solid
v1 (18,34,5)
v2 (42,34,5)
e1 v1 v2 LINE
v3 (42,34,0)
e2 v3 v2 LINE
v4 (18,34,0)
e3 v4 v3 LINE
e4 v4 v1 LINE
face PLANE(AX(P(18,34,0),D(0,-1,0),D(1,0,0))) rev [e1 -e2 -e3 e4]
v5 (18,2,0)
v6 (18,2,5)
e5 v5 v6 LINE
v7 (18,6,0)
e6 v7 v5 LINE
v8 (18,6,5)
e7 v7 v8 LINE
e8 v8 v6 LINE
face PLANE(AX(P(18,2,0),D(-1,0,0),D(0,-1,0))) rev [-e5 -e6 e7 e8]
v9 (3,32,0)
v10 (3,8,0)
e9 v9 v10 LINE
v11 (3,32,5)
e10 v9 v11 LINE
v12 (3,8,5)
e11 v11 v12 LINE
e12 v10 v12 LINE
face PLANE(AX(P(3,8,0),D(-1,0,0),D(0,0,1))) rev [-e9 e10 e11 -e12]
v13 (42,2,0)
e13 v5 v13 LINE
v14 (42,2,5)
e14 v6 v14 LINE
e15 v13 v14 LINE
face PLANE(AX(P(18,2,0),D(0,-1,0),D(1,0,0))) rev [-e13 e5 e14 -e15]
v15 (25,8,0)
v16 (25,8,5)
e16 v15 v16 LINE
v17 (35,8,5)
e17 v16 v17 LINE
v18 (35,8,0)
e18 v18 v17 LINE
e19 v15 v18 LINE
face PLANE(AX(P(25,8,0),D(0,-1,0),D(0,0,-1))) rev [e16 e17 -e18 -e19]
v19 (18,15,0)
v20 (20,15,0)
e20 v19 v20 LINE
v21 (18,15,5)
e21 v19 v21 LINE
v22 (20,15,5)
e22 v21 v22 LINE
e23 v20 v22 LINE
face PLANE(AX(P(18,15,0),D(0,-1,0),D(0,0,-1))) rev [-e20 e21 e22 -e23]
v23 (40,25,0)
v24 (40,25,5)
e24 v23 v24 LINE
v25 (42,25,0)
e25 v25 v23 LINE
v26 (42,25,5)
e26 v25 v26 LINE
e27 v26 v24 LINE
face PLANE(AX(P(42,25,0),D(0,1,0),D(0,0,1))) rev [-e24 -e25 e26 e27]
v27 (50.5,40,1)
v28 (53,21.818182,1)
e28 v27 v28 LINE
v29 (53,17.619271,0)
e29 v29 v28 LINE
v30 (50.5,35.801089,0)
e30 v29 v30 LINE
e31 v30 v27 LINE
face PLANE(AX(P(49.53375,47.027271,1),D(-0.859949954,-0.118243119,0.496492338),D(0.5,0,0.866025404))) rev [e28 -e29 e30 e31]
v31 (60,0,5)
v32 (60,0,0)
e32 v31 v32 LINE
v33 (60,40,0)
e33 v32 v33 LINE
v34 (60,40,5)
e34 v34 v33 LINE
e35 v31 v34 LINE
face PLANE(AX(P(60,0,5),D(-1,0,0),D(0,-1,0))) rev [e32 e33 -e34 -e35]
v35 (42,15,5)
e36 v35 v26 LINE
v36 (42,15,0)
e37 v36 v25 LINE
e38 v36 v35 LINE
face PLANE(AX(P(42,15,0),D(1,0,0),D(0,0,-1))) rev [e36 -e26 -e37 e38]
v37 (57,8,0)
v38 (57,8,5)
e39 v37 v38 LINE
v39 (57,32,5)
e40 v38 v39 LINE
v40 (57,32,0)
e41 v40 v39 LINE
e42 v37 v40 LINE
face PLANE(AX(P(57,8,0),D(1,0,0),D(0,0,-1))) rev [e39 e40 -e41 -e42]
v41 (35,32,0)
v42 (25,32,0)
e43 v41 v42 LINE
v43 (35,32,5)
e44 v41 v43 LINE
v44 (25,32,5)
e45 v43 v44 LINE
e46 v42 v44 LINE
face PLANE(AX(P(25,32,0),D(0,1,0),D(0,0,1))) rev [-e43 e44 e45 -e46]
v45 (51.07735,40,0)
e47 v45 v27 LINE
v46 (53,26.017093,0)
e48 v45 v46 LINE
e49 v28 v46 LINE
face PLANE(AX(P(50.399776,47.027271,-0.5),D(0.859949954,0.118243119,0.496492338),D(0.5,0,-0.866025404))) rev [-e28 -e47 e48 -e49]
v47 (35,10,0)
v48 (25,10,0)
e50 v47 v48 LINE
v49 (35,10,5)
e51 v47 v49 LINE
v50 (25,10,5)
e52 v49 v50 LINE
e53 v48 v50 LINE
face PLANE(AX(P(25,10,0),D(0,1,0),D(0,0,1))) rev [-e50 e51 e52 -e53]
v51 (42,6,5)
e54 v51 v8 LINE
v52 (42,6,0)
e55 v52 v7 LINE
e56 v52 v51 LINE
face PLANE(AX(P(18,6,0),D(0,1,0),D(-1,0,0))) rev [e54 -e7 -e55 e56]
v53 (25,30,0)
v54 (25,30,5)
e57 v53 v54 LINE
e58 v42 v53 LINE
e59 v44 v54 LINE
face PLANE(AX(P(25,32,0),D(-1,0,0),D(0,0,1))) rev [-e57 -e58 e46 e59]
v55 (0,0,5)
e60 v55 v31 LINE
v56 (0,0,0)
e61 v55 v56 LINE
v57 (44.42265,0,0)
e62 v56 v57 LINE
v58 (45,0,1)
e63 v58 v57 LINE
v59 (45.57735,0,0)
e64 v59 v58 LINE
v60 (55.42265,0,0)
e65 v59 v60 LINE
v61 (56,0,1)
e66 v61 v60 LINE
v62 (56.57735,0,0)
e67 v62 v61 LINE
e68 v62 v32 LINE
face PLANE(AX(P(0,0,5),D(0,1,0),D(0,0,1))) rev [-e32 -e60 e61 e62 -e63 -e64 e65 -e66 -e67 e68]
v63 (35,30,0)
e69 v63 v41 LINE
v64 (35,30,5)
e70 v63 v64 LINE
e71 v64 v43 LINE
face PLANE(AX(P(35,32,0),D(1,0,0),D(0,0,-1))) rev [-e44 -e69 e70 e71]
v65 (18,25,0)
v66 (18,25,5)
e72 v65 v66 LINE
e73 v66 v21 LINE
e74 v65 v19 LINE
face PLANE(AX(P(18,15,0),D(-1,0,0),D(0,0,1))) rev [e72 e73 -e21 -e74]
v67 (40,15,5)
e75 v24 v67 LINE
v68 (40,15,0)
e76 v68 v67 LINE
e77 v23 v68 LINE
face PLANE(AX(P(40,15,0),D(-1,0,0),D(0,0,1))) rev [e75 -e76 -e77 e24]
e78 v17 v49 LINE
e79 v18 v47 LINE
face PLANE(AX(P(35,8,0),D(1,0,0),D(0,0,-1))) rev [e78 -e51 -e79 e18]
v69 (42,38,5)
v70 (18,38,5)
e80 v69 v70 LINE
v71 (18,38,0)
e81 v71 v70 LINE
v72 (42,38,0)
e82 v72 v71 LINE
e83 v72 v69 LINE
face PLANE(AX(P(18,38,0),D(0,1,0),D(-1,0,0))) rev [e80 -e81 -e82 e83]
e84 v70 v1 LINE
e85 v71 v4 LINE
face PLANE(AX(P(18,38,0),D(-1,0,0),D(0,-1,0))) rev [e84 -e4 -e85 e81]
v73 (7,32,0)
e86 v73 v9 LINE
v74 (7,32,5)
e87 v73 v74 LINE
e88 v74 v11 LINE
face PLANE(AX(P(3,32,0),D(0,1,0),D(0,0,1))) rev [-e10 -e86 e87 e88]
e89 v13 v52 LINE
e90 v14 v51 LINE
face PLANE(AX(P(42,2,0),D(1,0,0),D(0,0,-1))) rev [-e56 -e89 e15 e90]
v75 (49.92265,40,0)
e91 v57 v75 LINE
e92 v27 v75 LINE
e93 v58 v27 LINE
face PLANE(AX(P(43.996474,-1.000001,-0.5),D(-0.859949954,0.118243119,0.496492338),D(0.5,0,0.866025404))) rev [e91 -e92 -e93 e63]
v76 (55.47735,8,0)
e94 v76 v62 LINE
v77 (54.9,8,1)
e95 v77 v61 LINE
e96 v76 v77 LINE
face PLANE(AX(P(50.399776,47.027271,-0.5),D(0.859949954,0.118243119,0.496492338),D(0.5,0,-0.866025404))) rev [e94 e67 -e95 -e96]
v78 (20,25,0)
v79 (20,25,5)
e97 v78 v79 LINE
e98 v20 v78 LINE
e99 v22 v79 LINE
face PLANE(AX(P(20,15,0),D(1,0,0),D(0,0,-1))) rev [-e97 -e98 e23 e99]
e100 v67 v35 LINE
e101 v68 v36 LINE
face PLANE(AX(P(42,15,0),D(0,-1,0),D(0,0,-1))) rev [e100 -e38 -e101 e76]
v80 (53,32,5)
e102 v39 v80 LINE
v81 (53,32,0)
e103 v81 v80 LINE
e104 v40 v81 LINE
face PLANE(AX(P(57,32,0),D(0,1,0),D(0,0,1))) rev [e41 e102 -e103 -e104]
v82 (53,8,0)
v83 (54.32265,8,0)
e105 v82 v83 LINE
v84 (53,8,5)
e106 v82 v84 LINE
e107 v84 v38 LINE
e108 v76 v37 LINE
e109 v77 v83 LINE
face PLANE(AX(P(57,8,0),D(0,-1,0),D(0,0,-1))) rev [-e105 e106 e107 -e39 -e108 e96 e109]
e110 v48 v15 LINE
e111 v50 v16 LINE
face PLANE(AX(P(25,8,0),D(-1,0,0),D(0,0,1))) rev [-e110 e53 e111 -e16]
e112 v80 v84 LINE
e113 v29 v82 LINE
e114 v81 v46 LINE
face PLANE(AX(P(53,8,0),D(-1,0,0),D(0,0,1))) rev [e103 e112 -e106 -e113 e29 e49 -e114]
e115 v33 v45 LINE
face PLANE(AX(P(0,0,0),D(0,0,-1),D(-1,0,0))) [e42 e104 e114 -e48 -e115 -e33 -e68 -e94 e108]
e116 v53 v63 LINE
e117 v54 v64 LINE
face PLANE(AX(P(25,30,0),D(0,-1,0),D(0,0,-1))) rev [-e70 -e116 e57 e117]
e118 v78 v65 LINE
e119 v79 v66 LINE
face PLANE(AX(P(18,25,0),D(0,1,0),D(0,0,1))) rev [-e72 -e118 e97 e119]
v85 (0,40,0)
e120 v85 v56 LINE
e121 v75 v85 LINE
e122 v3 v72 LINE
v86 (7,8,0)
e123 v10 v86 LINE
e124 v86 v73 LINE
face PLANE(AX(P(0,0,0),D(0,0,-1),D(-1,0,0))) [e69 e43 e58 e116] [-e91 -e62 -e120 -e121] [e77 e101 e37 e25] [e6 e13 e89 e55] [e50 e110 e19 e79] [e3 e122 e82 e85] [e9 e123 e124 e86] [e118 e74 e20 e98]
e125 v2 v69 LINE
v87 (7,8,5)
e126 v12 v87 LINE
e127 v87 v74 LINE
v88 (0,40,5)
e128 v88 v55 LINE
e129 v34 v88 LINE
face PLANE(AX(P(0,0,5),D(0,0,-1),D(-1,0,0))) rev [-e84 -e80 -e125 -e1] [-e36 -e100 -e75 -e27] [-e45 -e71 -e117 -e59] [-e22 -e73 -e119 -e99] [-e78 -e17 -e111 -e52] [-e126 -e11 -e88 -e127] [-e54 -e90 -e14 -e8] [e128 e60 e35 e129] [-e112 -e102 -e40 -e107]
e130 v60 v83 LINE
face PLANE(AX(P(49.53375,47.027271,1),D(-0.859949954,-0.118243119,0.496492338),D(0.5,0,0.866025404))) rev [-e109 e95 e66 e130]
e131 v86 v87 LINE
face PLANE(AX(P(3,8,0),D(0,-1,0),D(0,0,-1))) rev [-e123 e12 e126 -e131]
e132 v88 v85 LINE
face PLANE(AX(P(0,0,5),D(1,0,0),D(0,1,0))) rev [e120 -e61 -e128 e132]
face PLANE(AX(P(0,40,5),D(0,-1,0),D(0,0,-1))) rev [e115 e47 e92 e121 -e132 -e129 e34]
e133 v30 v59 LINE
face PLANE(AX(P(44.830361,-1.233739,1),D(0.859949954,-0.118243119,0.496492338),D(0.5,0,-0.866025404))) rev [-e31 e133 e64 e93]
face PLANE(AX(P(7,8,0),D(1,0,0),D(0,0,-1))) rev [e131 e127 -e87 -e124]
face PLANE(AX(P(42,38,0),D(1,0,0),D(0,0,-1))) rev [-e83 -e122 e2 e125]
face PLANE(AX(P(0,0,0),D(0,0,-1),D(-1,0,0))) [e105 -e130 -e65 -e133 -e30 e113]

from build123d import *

# Parameters (mm, degrees)
SKETCH_1_W          = 60
SKETCH_1_H          = 40
EXTRUDE_1_DEPTH     = 5
SKETCH_2_W          = 2
SKETCH_2_H          = 10
SKETCH_2_W_2        = 10
SKETCH_2_H_2        = 2
SKETCH_2_W_3        = 4
SKETCH_2_H_3        = 24
SKETCH_2_W_4        = 24
SKETCH_2_H_4        = 4
CUT_EXTRUDE_1_DEPTH = 73.284161474
SWEEP_START         = -34
SWEEP_2_DEPTH       = 43
SWEEP_2_2_DEPTH     = 48


with BuildPart() as part:
    # 草图1 → 凸台-拉伸1 (new body)
    with BuildSketch(Plane.XY):
        with Locations((30, 20)):
            Rectangle(SKETCH_1_W, SKETCH_1_H)
    extrude(amount=EXTRUDE_1_DEPTH)

    # 草图2 → 切除-拉伸1 (cut, through all)
    with BuildSketch(Plane.XY.offset(5)):
        with Locations((19, 20)):
            Rectangle(SKETCH_2_W, SKETCH_2_H)
        with Locations((41, 20)):
            Rectangle(SKETCH_2_W, SKETCH_2_H)
        with Locations((30, 31)):
            Rectangle(SKETCH_2_W_2, SKETCH_2_H_2)
        with Locations((30, 9)):
            Rectangle(SKETCH_2_W_2, SKETCH_2_H_2)
        with Locations((5, 20)):
            Rectangle(SKETCH_2_W_3, SKETCH_2_H_3)
        with Locations((55, 20)):
            Rectangle(SKETCH_2_W_3, SKETCH_2_H_3)
        with Locations((30, 36)):
            Rectangle(SKETCH_2_W_4, SKETCH_2_H_4)
        with Locations((30, 4)):
            Rectangle(SKETCH_2_W_4, SKETCH_2_H_4)
    extrude(amount=-CUT_EXTRUDE_1_DEPTH, mode=Mode.SUBTRACT)

    # 切除-扫描2: read off the stored shape, not the designer's step
    # 切除-扫描2 outline → 切除-扫描2 (cut)
    with BuildSketch(Plane(origin=(0, 0, 0), x_dir=(0.9906788398452959, 0.13621834047872788, 0), z_dir=(0.13621834047872786, -0.9906788398452959, 0)).offset(SWEEP_START)):
        Polygon((56.049983726, 0), (55.478015031, 1), (54.906046336, 0), align=None)
    extrude(amount=SWEEP_2_DEPTH, mode=Mode.SUBTRACT)

    # Sweep 2 2 outline → Sweep 2 2 (cut)
    with BuildSketch(Plane(origin=(0, 0, 0), x_dir=(0.9906788398452959, -0.13621834047872777, 0), z_dir=(0.13621834047872777, 0.9906788398452959, 0))):
        Polygon((45.152516488, 0), (44.008579098, 0), (44.580547793, -1), align=None)
    extrude(amount=SWEEP_2_2_DEPTH, mode=Mode.SUBTRACT)


solid = part.part
